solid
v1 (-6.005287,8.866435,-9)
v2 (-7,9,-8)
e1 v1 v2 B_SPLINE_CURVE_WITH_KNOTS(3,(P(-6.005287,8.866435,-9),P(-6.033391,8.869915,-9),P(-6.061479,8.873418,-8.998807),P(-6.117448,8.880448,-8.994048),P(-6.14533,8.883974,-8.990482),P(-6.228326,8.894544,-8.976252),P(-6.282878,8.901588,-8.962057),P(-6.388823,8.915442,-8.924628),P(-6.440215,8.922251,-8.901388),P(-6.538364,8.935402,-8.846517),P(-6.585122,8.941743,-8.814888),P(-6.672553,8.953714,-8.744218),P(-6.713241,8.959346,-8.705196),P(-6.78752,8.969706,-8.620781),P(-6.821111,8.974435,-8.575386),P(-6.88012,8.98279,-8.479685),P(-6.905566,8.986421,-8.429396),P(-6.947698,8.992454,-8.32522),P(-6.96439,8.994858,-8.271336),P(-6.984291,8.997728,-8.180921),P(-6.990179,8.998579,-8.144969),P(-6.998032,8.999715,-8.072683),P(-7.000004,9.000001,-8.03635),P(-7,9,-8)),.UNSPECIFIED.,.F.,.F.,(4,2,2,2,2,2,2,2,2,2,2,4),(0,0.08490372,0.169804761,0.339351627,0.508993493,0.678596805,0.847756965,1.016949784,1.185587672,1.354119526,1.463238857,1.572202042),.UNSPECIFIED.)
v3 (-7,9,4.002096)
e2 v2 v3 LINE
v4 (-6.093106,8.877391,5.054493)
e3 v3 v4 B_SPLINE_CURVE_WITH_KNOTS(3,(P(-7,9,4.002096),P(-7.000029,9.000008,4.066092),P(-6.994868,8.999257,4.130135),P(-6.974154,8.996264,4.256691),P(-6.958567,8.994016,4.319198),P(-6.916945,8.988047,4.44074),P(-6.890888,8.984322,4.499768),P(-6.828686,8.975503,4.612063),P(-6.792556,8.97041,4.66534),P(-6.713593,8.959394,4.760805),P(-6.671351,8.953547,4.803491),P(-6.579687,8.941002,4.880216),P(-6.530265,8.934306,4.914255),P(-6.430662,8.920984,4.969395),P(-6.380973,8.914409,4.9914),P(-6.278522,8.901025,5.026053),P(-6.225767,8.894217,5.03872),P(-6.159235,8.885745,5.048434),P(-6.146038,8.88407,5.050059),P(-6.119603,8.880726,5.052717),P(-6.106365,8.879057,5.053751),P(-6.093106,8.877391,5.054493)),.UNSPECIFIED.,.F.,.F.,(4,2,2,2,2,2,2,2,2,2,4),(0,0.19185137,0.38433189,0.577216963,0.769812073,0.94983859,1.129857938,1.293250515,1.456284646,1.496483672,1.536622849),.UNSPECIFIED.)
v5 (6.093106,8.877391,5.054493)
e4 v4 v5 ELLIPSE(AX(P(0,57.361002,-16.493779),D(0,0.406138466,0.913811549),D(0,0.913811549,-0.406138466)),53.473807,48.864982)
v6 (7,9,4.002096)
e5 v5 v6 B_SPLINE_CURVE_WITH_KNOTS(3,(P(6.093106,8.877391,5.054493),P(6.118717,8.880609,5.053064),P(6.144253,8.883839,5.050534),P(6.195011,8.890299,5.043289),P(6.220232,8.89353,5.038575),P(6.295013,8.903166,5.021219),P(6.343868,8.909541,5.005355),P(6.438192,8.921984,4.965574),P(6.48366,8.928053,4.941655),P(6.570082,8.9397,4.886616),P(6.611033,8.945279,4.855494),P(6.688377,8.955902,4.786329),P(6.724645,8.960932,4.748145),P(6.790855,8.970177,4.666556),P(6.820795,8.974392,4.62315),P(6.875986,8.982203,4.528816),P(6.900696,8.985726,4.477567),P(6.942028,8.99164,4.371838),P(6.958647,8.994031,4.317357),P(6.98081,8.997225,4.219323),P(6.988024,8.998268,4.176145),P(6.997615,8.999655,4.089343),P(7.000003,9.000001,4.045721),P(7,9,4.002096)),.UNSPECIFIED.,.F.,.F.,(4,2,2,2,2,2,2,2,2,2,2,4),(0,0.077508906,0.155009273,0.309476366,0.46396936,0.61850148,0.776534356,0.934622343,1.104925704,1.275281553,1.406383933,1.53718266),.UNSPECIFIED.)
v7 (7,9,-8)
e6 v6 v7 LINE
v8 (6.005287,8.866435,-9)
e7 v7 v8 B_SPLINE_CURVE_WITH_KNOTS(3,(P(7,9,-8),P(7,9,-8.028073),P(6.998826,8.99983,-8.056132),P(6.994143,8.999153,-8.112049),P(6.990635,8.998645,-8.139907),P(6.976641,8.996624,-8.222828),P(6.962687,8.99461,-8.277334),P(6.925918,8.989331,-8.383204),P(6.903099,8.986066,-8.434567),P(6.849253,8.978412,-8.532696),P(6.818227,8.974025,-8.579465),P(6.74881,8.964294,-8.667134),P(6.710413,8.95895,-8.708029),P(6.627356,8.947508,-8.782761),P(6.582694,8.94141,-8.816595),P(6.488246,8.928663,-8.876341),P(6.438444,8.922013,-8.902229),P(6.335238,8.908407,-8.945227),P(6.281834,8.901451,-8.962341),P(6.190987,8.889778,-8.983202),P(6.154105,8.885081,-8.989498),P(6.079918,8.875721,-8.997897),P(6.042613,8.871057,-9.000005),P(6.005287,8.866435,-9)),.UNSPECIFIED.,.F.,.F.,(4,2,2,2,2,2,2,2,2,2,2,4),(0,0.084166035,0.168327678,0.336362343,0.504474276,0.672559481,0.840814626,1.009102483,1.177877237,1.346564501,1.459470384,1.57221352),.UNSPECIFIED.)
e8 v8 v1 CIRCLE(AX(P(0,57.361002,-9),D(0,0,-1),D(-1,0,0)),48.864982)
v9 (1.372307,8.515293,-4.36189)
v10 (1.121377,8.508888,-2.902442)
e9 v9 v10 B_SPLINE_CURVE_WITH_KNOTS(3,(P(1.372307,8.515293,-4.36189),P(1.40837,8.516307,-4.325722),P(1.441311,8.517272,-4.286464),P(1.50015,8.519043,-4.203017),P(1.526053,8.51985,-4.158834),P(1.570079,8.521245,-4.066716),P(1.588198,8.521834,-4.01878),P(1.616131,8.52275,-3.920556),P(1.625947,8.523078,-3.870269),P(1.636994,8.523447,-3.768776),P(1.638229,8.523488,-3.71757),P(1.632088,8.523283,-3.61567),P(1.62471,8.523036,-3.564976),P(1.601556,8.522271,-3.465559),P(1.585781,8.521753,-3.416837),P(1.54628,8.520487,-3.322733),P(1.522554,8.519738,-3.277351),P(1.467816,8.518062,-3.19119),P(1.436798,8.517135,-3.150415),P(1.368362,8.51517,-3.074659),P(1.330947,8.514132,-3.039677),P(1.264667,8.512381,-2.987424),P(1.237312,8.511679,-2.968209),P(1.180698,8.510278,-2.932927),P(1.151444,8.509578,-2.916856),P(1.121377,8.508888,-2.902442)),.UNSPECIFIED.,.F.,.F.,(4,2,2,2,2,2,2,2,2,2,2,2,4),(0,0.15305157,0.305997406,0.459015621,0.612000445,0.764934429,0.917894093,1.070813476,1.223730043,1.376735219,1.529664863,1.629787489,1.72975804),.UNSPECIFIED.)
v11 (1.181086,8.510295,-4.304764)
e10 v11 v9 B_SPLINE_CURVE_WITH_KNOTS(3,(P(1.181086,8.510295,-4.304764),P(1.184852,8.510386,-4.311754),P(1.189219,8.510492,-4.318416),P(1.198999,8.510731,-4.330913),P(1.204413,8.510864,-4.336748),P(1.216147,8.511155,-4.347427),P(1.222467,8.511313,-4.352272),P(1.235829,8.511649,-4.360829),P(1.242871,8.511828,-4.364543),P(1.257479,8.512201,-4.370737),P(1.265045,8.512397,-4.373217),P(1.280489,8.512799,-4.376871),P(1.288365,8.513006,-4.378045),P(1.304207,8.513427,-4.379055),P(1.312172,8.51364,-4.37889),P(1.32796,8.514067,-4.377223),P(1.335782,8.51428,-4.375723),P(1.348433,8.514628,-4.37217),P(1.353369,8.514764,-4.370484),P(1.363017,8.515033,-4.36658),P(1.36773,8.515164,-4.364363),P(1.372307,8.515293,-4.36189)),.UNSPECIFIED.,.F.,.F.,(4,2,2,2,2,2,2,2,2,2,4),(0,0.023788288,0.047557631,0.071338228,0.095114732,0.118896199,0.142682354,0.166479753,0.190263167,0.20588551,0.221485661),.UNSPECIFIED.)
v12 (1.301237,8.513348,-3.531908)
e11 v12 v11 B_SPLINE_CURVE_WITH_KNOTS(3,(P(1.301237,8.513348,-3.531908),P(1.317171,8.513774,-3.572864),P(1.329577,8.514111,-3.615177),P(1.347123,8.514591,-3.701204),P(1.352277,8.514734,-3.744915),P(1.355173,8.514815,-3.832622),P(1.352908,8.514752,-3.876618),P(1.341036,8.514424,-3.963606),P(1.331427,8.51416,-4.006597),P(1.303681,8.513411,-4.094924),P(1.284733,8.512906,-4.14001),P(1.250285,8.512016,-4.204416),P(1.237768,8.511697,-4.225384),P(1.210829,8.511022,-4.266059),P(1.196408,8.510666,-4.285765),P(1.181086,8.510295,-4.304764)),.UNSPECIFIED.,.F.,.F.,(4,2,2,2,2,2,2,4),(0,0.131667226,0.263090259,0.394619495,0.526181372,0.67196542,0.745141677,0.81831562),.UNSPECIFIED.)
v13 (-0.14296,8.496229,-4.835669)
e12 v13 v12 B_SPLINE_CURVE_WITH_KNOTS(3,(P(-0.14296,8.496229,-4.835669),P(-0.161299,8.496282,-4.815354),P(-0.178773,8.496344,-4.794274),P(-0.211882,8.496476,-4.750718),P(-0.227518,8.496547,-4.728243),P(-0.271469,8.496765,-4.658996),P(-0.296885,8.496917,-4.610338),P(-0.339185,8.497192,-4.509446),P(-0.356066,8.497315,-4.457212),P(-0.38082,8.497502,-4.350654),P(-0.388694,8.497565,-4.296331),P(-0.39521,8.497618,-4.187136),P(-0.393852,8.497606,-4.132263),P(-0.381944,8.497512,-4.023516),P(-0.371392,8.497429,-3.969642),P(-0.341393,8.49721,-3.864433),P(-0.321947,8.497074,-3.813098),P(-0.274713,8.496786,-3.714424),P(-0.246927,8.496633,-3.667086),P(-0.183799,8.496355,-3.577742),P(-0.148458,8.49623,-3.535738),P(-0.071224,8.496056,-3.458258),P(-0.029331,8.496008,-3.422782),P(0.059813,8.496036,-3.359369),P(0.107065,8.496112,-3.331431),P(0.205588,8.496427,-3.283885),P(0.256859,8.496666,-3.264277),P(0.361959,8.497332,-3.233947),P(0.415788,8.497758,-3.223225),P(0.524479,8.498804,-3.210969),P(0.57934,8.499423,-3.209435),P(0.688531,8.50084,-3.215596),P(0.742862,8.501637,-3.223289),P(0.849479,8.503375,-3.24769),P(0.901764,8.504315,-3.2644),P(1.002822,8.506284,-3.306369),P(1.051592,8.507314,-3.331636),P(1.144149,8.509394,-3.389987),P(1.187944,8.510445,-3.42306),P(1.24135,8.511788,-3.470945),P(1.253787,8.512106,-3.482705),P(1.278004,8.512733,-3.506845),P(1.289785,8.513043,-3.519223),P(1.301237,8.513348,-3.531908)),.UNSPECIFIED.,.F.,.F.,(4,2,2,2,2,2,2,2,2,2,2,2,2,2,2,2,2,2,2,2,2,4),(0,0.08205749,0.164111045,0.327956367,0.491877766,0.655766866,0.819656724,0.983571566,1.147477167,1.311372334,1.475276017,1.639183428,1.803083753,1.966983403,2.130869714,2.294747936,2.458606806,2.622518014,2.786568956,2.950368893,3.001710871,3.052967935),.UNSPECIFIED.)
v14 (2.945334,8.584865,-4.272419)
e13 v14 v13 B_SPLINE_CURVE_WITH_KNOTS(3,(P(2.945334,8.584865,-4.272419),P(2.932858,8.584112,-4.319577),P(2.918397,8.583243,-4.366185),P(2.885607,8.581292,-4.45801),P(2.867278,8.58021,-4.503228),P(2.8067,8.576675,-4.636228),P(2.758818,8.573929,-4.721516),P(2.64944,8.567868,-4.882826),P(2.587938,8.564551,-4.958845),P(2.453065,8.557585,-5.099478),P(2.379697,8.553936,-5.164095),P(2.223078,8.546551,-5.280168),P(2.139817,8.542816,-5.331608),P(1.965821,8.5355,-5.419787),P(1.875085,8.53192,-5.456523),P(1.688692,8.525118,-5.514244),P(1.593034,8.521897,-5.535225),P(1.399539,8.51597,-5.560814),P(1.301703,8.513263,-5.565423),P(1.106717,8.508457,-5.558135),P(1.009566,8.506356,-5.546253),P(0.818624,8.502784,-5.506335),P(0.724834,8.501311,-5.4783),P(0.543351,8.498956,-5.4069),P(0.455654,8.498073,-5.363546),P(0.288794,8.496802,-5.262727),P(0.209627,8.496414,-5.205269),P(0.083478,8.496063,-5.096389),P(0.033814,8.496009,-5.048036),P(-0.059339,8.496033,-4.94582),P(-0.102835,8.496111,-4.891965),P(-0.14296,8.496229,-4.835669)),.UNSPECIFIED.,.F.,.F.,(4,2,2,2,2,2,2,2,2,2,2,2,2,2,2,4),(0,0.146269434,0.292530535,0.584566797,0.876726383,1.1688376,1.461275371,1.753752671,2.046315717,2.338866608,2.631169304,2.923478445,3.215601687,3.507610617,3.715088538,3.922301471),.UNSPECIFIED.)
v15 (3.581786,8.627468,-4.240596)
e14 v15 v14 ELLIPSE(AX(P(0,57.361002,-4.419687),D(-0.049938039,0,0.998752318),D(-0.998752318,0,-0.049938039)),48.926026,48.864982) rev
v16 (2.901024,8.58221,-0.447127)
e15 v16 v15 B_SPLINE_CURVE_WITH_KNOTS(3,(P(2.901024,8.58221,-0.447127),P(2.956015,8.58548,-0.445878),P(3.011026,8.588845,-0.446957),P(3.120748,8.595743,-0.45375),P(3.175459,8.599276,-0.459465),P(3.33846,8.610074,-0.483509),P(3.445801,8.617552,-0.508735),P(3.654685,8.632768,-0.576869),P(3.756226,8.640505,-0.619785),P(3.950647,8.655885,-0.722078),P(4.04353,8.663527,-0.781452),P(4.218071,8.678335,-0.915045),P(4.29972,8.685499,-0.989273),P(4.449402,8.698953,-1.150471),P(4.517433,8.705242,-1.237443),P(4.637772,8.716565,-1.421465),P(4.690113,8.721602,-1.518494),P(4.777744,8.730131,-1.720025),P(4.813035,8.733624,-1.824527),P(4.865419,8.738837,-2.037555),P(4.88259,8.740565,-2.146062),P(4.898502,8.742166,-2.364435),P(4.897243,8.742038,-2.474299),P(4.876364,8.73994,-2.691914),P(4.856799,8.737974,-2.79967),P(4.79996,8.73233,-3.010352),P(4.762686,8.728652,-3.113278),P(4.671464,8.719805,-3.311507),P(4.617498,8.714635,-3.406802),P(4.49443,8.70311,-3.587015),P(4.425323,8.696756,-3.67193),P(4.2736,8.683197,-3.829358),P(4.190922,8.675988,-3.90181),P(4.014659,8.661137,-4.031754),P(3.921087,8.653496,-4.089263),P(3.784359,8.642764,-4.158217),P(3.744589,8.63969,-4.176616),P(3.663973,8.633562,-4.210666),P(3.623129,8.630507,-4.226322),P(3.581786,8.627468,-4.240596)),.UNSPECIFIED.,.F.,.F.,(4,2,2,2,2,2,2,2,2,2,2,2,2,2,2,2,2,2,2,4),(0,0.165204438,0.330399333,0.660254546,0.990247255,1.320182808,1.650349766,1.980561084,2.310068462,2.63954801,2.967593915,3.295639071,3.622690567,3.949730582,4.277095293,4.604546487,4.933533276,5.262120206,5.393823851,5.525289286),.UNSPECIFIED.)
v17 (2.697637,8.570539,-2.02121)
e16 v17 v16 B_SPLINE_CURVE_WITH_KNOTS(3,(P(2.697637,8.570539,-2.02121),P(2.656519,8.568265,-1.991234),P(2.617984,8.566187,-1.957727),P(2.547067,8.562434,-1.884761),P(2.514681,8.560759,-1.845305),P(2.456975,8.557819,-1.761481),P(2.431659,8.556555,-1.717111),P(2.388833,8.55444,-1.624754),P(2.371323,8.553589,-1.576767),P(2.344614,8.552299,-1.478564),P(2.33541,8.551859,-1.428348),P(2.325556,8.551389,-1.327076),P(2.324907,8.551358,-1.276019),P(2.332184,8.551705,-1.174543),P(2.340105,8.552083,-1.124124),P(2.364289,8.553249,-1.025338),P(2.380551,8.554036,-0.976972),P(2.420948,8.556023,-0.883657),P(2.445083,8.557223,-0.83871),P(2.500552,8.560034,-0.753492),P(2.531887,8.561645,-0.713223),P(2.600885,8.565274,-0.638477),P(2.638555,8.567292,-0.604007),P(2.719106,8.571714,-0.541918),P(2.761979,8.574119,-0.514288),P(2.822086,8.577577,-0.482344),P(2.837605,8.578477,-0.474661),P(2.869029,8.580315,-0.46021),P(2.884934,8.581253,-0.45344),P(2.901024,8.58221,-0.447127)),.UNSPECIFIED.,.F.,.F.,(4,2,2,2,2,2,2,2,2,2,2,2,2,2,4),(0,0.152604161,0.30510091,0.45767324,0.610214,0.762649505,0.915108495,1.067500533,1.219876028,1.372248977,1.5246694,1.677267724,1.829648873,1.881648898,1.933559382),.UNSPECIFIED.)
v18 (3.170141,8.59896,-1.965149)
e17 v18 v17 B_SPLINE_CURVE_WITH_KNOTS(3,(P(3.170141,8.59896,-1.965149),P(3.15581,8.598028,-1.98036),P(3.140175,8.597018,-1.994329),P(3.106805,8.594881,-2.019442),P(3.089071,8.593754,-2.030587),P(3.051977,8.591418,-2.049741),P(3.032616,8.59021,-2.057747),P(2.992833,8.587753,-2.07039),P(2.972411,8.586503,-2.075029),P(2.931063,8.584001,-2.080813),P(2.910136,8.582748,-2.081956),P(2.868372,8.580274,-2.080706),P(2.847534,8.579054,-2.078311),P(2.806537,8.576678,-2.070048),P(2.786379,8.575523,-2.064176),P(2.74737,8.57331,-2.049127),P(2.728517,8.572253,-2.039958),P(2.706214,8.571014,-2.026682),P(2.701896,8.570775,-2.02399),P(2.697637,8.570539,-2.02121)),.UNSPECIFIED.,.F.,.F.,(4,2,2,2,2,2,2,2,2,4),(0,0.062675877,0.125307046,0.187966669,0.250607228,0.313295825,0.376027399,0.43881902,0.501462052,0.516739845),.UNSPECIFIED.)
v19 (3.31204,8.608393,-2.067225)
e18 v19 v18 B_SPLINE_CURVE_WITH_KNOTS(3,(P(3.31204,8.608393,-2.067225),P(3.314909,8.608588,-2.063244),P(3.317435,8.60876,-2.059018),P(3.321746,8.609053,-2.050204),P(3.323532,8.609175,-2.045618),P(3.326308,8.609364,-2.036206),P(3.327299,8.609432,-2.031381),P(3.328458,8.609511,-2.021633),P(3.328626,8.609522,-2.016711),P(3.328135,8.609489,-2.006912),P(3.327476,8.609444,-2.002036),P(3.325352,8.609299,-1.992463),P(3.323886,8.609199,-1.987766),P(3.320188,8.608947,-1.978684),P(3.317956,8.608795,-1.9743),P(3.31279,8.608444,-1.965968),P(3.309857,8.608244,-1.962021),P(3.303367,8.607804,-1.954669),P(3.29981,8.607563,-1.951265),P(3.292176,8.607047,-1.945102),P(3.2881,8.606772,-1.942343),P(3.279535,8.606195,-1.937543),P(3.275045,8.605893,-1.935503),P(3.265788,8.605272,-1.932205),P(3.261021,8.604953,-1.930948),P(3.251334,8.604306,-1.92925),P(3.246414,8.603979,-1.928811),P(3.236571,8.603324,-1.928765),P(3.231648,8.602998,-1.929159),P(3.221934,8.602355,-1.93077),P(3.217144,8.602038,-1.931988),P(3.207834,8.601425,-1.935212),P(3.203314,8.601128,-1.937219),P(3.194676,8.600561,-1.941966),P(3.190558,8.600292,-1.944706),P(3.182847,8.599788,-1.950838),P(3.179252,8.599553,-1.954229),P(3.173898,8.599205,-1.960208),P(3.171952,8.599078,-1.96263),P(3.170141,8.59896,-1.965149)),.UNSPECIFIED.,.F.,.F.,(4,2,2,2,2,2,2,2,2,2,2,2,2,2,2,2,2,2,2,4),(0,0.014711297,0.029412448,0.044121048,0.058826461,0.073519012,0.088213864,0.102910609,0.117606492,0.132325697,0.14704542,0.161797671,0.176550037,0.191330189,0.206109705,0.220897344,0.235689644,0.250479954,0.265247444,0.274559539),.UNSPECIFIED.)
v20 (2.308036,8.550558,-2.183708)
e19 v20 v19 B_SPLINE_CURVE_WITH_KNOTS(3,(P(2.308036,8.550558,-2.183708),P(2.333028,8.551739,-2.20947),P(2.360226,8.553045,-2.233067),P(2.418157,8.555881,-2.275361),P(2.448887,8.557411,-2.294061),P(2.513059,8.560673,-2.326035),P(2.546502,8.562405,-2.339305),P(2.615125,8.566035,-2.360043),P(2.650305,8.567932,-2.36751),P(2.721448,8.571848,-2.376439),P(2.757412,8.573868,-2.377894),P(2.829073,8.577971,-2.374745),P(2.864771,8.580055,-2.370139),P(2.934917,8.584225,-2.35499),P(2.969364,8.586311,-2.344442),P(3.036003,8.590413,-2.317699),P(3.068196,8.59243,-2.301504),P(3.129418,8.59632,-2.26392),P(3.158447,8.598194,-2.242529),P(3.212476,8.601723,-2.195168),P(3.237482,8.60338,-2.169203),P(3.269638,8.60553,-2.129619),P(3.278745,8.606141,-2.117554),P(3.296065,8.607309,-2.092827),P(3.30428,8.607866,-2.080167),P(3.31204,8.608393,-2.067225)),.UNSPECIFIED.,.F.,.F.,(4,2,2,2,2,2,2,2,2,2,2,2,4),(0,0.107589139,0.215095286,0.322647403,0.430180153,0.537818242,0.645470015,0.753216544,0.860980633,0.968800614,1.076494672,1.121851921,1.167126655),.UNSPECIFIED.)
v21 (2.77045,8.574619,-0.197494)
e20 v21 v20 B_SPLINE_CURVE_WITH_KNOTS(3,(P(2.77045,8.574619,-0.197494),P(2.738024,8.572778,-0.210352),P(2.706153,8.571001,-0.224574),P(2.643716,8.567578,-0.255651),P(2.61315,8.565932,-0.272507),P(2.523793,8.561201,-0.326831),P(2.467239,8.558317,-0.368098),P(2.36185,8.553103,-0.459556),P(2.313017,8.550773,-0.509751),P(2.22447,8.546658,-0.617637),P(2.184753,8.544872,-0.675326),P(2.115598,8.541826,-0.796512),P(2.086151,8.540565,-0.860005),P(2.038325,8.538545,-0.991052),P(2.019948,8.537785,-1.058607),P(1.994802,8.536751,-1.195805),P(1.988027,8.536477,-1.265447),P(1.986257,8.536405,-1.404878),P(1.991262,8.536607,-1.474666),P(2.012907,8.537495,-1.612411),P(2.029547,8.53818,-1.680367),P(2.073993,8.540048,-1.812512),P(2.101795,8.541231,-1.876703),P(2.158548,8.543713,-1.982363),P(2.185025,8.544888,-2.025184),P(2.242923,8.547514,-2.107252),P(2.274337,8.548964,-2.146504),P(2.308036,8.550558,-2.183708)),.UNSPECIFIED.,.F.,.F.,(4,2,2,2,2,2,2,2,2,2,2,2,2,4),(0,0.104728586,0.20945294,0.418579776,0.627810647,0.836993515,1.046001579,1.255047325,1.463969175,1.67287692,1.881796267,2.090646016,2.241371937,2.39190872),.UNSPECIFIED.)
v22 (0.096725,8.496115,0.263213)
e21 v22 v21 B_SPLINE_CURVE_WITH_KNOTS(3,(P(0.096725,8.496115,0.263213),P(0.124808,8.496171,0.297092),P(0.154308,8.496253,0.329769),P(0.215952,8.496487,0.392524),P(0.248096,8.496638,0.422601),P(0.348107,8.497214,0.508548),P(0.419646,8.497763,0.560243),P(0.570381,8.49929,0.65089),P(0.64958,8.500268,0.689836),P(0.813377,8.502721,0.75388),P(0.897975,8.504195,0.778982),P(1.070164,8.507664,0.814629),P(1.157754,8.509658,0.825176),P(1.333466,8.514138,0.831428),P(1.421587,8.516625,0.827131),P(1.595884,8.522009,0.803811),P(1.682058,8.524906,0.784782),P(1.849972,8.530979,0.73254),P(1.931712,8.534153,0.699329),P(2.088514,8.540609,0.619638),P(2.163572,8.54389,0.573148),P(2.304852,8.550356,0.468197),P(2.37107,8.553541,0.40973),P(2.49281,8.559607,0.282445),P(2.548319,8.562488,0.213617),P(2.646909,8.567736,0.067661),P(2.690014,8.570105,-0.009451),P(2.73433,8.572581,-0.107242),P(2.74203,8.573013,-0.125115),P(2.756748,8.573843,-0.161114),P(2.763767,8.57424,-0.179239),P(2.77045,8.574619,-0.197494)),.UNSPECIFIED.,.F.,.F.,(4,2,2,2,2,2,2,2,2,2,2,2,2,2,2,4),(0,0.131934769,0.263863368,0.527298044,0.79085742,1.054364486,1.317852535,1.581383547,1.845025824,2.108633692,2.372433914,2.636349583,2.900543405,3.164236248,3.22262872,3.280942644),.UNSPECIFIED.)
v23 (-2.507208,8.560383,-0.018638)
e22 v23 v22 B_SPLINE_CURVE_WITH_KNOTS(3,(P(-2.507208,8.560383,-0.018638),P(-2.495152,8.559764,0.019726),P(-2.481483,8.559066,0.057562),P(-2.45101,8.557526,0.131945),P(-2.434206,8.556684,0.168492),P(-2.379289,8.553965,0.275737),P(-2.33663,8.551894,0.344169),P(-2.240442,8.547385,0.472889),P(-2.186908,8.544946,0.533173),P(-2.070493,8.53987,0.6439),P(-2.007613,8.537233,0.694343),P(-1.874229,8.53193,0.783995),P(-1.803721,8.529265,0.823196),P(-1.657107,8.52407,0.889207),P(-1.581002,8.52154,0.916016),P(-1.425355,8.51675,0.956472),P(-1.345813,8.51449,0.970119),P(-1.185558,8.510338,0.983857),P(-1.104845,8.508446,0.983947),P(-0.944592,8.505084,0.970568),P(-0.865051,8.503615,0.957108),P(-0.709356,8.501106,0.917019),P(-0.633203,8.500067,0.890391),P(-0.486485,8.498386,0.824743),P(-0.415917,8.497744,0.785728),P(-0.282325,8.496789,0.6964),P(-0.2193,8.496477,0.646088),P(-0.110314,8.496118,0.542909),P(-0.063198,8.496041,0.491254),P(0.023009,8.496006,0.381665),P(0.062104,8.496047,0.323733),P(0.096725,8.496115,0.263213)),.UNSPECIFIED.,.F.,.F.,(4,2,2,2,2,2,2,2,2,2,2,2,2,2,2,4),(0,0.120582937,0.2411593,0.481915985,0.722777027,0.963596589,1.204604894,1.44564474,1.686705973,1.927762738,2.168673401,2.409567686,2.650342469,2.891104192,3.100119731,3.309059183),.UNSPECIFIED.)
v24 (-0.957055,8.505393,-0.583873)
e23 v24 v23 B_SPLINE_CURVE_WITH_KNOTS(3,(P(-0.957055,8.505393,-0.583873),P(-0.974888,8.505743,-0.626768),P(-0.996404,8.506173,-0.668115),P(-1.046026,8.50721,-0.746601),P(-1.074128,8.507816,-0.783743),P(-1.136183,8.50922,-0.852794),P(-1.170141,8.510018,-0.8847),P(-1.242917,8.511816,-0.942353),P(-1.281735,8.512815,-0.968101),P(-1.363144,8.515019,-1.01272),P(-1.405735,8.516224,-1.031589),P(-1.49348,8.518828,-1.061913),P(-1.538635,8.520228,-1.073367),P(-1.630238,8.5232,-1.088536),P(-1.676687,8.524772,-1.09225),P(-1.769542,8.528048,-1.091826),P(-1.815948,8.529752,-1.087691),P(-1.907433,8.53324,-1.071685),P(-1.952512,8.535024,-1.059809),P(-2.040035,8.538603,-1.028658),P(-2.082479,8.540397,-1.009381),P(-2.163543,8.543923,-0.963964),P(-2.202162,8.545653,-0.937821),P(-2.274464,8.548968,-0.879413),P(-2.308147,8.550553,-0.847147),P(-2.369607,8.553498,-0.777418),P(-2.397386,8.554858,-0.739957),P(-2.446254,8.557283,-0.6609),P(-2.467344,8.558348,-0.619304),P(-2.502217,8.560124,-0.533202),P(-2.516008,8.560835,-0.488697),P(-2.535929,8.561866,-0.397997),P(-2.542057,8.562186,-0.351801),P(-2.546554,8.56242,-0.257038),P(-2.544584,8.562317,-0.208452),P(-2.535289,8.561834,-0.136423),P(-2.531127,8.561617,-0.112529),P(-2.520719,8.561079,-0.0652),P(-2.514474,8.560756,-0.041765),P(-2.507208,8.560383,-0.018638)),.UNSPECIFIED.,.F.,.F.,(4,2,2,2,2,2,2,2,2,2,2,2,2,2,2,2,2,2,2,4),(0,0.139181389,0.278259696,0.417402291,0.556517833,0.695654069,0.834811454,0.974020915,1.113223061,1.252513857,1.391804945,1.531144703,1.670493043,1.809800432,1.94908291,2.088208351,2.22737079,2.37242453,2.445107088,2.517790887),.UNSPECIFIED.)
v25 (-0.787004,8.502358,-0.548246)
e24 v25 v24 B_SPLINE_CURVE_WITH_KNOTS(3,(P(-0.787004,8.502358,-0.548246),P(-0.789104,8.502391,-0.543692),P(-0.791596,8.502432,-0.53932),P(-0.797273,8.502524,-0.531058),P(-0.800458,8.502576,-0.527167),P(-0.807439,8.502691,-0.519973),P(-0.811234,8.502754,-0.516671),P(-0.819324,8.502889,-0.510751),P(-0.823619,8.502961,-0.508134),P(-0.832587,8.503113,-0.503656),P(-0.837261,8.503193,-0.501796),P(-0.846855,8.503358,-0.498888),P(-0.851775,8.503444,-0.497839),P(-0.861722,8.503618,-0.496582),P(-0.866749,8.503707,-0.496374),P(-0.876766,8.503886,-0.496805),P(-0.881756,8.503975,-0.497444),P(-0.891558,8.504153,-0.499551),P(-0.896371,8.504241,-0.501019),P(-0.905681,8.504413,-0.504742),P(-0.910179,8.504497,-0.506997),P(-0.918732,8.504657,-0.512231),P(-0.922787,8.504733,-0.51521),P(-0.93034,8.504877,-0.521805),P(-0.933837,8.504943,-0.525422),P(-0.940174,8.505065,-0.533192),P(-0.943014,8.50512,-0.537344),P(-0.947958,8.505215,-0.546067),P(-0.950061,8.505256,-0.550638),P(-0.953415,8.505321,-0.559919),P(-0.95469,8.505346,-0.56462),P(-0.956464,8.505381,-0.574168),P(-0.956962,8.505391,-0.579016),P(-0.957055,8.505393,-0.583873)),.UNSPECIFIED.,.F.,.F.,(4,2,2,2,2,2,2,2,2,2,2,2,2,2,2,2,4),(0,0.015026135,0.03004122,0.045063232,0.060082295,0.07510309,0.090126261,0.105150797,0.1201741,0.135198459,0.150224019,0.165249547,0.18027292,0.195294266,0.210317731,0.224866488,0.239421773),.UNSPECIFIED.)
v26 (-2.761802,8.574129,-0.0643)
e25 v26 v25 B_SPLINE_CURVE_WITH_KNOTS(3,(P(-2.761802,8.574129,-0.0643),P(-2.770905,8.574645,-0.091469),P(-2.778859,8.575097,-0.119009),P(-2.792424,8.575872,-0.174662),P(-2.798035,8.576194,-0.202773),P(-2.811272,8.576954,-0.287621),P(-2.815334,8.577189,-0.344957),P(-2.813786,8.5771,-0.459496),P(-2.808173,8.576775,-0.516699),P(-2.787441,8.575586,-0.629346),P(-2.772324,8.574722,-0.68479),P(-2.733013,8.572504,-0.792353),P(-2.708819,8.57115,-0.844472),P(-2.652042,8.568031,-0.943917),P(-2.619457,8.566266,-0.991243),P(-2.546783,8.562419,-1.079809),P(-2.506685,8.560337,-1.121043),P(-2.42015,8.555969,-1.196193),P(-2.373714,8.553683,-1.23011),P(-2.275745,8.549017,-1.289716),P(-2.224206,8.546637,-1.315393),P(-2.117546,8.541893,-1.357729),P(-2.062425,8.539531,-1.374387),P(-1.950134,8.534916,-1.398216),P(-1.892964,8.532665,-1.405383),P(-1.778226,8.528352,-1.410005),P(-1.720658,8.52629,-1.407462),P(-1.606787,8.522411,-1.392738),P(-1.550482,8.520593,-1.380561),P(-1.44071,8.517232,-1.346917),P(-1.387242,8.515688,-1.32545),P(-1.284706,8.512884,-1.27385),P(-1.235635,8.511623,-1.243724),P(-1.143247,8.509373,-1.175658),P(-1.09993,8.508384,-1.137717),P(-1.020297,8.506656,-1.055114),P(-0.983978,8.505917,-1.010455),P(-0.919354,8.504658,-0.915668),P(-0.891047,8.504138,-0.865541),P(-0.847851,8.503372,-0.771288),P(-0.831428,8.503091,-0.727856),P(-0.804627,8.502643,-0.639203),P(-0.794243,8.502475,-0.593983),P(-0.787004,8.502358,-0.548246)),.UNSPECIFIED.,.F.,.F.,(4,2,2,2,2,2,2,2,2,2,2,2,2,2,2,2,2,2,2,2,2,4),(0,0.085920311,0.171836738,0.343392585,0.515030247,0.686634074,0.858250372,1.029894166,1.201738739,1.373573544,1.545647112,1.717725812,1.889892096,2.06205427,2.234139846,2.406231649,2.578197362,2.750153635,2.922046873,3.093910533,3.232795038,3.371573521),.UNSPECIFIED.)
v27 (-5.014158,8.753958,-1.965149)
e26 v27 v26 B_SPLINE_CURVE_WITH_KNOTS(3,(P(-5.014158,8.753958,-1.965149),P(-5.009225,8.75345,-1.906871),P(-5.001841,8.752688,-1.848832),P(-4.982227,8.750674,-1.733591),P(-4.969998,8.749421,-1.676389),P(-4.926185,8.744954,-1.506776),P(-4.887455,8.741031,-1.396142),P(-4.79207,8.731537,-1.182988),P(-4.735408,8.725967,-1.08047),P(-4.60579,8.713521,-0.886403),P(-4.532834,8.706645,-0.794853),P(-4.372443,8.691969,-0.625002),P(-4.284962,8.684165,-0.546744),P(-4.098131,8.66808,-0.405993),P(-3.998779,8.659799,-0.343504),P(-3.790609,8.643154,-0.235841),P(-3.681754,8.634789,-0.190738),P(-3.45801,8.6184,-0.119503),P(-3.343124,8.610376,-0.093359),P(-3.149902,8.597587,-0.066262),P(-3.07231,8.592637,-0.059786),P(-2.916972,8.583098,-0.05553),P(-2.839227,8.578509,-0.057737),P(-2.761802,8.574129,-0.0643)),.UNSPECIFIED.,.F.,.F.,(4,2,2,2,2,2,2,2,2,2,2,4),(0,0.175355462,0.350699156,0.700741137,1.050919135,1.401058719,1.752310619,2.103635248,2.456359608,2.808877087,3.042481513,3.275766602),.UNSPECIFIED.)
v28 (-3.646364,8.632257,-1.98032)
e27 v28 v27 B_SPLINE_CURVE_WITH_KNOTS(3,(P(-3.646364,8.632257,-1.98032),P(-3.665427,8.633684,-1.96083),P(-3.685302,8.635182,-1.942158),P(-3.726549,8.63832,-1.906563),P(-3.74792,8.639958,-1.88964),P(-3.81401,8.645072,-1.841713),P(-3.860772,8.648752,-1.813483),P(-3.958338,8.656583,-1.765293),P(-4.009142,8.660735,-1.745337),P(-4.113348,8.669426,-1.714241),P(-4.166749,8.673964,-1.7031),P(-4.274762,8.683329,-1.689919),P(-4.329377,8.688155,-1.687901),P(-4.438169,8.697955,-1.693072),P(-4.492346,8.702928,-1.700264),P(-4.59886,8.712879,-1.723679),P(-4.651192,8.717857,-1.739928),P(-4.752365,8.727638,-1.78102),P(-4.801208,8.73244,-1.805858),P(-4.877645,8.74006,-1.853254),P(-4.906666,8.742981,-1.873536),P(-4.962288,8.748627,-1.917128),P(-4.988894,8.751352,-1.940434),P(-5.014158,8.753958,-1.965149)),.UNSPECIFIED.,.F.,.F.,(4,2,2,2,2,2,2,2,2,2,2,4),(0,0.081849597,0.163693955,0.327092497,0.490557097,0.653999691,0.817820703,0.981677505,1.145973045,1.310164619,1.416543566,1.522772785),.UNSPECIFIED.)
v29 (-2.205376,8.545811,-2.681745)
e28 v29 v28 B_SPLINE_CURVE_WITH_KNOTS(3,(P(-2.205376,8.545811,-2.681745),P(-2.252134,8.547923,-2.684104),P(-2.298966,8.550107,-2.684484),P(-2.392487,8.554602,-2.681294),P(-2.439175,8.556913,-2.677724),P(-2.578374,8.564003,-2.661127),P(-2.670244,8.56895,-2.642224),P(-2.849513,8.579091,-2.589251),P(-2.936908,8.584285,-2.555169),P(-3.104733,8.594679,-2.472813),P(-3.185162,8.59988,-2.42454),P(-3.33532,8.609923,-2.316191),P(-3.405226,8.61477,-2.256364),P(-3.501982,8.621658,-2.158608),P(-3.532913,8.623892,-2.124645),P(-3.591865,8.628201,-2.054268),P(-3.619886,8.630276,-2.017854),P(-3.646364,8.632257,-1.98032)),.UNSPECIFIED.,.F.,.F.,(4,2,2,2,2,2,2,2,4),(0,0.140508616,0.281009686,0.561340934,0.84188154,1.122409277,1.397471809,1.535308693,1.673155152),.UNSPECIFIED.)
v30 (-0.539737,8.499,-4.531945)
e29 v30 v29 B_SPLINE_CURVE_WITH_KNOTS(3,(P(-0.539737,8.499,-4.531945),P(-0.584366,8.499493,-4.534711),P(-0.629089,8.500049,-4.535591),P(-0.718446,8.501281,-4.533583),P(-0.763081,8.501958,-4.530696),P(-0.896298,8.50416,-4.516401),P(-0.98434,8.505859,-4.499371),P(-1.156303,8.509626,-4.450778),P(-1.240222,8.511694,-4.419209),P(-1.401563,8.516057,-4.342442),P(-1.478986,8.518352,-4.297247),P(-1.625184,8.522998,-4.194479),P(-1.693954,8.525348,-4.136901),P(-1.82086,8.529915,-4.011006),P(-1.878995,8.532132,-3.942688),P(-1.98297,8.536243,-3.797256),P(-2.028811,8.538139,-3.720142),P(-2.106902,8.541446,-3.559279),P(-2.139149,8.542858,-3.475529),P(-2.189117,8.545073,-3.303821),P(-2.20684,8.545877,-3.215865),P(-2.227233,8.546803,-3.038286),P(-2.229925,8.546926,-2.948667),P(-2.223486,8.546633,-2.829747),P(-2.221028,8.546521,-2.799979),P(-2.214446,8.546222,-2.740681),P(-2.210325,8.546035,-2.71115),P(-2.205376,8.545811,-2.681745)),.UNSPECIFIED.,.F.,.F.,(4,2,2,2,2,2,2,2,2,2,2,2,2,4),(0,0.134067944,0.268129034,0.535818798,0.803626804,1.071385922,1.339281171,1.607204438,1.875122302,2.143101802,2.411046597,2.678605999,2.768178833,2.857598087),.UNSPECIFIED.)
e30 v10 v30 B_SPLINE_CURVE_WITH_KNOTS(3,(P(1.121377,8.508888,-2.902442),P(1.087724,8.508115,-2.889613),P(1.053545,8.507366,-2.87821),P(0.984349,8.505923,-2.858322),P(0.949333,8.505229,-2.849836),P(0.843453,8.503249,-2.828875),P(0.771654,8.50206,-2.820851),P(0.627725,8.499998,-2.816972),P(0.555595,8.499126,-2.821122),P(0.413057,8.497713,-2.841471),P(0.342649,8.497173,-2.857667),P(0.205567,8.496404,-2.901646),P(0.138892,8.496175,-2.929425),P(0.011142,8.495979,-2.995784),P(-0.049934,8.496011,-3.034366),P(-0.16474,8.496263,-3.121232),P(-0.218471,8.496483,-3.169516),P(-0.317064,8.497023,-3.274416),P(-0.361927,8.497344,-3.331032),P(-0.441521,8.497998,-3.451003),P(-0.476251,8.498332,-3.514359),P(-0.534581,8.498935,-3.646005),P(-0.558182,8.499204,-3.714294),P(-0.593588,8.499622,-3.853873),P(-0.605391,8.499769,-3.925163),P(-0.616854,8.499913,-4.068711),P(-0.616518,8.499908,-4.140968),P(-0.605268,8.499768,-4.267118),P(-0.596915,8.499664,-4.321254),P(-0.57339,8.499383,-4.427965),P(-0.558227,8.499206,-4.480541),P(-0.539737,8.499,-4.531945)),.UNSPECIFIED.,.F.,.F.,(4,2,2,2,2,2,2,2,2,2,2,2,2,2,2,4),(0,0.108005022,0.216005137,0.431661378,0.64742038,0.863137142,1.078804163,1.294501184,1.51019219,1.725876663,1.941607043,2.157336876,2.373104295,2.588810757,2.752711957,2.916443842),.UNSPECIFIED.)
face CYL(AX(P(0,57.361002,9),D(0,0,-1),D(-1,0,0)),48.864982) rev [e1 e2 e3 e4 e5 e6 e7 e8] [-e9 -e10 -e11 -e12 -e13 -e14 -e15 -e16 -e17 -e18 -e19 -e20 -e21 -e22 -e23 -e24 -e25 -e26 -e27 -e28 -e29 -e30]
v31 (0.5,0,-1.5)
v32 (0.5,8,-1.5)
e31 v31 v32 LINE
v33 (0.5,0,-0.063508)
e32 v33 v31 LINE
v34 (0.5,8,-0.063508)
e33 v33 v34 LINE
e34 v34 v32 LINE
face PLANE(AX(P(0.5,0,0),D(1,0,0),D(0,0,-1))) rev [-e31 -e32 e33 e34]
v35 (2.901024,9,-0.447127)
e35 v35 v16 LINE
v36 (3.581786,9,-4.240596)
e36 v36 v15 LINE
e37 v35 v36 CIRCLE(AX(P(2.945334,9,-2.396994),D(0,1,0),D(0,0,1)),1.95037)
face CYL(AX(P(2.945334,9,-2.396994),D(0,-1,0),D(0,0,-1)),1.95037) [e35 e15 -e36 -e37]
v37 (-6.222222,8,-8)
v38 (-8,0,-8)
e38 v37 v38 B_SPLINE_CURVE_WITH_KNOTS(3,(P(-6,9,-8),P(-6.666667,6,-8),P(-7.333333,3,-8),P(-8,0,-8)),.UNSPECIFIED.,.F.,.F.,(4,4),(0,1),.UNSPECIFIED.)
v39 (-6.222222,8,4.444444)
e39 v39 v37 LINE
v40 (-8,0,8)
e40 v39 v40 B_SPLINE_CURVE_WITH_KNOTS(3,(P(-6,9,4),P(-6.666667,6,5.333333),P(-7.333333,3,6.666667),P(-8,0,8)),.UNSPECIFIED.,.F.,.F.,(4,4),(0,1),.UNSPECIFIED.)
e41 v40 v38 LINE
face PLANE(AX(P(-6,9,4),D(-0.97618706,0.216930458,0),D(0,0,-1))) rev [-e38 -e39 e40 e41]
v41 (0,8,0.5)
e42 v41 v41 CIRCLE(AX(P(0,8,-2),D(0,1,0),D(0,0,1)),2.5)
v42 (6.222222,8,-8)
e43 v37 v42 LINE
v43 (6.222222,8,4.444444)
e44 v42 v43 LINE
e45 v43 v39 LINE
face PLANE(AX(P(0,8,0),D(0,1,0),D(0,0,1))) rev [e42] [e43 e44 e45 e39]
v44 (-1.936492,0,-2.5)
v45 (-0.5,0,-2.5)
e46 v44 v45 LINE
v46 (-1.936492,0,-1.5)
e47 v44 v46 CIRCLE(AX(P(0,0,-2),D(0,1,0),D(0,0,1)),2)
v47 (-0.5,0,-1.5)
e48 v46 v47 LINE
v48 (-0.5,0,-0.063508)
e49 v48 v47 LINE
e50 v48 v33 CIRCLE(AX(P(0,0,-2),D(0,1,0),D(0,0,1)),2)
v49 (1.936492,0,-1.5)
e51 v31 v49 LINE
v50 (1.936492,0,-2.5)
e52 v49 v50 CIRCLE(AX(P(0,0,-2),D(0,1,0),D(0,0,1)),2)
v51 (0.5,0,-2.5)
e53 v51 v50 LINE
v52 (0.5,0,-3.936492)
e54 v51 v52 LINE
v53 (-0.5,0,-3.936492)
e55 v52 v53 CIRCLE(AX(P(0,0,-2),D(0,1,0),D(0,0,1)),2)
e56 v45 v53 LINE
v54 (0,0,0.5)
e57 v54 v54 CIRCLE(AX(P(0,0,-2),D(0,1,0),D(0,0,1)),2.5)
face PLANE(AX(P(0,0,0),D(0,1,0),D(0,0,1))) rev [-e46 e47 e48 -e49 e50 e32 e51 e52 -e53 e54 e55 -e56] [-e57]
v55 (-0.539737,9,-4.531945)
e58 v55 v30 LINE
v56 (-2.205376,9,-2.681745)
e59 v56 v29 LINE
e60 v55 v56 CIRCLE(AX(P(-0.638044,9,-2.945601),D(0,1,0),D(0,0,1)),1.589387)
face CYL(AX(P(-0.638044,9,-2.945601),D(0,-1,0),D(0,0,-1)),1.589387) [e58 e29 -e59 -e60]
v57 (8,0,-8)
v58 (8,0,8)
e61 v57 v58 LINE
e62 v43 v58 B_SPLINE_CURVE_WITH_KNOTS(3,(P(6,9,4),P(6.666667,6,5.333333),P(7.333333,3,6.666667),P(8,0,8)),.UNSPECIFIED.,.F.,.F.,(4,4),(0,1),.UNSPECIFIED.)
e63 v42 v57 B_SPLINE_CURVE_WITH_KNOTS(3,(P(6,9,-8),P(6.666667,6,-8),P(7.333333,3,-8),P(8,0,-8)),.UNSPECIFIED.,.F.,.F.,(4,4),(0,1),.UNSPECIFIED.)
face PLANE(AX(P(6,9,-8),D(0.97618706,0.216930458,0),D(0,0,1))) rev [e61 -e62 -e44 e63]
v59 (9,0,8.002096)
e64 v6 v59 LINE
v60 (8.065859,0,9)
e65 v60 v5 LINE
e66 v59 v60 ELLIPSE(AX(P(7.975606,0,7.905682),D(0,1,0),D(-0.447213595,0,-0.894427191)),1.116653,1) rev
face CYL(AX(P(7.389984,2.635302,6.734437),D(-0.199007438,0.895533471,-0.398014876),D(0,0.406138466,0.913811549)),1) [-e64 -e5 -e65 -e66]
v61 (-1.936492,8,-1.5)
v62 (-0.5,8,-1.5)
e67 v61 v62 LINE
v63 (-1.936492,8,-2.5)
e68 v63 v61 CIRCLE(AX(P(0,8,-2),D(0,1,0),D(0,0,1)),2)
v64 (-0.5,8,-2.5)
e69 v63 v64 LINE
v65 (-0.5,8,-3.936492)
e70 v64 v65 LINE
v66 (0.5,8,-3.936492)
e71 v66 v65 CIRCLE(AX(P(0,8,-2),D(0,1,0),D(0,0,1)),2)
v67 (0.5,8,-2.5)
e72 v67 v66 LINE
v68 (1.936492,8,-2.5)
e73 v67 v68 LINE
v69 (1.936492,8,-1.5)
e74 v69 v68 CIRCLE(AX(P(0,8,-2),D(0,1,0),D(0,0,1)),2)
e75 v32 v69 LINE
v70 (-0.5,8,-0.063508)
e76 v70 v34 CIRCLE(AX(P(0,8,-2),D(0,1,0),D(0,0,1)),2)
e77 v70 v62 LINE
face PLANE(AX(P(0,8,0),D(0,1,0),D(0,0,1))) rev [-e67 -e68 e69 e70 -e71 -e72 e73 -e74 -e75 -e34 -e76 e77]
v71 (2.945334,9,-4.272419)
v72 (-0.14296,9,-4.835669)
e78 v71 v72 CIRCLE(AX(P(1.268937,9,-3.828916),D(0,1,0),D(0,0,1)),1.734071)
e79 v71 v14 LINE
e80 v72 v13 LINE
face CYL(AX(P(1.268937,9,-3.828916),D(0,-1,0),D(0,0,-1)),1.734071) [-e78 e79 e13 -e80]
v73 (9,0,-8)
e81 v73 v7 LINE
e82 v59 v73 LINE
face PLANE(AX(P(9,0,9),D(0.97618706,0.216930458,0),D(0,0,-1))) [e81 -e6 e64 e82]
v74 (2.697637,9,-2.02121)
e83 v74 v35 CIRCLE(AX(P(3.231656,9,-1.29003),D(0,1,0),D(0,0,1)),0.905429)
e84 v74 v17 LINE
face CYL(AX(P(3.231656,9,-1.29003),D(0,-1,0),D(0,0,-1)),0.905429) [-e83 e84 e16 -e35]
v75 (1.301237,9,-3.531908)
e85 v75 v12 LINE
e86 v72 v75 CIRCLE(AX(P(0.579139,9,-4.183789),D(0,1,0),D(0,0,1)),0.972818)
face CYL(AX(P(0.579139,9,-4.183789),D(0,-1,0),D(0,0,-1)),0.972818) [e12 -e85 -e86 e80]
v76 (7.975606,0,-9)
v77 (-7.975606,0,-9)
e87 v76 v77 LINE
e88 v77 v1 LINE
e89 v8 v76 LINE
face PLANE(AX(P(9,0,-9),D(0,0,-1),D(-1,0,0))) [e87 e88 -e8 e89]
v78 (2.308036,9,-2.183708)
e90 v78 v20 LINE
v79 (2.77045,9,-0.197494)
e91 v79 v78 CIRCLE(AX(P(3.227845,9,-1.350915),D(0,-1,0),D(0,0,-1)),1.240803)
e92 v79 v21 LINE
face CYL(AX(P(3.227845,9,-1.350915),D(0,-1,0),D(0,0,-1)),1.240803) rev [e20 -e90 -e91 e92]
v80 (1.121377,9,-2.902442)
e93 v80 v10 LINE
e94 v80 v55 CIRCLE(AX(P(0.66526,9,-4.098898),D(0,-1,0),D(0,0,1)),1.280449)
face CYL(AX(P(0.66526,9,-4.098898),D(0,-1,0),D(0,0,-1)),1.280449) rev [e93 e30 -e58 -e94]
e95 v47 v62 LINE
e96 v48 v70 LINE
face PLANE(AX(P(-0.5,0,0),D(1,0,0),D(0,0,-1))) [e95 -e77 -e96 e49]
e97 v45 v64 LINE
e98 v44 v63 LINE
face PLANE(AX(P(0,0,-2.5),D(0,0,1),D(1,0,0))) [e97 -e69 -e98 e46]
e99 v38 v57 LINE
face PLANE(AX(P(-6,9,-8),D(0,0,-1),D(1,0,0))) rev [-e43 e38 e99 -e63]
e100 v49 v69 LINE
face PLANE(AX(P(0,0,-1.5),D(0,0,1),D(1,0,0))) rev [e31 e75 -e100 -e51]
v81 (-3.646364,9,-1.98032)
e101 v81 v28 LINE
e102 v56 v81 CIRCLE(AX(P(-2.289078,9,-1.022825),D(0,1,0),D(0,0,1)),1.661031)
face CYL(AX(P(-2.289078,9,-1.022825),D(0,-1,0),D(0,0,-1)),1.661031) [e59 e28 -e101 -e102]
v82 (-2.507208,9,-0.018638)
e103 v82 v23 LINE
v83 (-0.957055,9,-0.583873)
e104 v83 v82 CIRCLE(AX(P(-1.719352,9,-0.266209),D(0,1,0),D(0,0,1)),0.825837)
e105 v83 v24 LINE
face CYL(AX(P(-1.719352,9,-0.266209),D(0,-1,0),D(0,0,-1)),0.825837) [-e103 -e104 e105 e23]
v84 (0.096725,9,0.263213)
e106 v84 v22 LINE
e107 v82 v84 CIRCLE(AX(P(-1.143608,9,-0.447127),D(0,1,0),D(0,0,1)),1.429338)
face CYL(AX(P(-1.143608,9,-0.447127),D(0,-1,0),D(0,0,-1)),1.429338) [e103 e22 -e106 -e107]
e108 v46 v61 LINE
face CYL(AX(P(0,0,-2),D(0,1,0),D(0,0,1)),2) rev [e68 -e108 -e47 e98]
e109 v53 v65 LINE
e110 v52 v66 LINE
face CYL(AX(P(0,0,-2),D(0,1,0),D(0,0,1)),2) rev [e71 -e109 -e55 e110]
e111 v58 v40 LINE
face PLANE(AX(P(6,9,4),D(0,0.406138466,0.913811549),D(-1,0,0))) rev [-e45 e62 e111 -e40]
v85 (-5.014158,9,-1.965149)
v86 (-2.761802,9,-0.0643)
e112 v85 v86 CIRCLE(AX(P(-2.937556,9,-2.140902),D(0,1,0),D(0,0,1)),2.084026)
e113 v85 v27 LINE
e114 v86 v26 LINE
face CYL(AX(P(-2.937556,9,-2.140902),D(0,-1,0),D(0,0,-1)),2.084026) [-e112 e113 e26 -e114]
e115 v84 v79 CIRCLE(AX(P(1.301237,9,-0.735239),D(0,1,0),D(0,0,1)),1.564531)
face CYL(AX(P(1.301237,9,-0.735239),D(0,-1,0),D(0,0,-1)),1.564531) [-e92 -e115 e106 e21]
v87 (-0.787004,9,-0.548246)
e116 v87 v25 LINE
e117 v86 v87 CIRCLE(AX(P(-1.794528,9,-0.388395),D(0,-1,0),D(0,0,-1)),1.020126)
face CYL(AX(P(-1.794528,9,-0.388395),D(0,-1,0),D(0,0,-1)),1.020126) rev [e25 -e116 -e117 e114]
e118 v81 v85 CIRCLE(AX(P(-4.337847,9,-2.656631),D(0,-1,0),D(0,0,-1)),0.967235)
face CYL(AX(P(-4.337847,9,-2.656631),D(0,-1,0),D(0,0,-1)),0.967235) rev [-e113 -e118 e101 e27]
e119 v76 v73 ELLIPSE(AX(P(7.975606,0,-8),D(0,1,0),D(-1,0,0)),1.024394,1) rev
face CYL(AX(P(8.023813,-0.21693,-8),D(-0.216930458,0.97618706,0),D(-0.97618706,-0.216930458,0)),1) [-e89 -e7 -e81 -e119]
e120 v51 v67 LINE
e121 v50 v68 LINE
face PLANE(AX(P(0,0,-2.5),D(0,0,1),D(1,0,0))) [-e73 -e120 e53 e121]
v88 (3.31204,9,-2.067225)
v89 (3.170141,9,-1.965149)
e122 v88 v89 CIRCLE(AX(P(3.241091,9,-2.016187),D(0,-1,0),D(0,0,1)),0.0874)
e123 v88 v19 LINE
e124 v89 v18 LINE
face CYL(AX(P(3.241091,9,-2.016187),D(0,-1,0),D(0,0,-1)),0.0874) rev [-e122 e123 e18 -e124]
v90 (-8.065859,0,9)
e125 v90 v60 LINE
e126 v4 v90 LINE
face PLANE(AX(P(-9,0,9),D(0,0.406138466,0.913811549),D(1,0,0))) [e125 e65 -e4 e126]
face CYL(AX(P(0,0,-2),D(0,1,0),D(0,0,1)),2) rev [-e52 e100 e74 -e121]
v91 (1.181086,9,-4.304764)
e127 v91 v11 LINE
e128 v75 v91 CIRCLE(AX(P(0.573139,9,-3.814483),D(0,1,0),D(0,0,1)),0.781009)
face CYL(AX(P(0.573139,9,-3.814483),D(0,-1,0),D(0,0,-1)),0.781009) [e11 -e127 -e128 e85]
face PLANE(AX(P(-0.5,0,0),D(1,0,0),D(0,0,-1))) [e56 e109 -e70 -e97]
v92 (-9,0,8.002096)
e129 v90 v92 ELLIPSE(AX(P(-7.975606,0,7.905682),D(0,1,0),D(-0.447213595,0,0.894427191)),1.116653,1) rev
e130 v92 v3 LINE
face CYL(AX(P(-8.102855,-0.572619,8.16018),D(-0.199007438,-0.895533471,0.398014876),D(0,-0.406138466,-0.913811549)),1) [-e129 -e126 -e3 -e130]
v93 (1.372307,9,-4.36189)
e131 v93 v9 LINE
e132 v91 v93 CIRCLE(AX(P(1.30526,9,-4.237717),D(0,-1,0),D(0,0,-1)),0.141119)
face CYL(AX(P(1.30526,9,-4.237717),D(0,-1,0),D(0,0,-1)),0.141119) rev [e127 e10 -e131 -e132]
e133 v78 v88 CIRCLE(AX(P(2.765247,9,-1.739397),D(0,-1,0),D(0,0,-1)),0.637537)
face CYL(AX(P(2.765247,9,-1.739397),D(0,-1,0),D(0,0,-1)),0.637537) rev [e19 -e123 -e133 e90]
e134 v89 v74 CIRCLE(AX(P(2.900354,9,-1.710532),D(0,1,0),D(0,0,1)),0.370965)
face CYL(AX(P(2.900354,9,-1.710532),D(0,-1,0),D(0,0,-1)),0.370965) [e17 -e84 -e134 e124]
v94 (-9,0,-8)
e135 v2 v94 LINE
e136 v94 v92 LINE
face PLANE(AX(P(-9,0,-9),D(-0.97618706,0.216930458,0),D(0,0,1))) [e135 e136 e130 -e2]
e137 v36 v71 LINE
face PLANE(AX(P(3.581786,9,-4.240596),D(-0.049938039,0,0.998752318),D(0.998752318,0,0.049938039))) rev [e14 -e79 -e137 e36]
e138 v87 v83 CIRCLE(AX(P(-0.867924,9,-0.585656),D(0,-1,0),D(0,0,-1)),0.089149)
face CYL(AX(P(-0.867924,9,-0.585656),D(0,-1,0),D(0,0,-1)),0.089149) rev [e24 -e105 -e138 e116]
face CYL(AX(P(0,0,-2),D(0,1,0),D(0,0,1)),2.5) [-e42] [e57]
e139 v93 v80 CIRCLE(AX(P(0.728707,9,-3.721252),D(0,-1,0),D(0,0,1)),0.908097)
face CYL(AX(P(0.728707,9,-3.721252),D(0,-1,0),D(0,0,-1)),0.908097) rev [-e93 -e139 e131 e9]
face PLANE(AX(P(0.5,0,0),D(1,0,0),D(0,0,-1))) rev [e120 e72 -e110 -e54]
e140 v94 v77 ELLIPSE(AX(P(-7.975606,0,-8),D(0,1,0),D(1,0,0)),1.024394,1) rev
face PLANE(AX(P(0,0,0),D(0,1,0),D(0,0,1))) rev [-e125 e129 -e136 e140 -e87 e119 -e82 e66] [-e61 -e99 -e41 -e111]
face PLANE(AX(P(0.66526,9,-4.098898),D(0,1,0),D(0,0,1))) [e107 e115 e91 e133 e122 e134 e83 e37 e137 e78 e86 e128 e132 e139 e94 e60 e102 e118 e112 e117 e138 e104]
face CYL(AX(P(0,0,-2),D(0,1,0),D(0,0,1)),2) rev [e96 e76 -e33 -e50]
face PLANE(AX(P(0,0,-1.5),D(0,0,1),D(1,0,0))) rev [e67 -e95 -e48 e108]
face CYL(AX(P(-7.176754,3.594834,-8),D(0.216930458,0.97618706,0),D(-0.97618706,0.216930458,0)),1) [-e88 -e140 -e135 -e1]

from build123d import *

# Parameters (mm, degrees)
BOSS_EXTRUDE1_DEPTH = 1
BOSS_EXTRUDE2_START = -1
BOSS_EXTRUDE2_DEPTH = 8
CUT_EXTRUDE1_DEPTH  = 18
FILLET2_R           = 1
BOSS_EXTRUDE3_START = 8
BOSS_EXTRUDE3_DEPTH = 1


with BuildPart() as part:
    # Sketch1 → Loft2 section 0
    with BuildSketch(Plane(origin=(0, 0, 0), x_dir=(1, 0, 0), z_dir=(0, 1, 0))):
        with BuildLine():
            Line((9, -9), (-9, -9))
            Line((-9, -9), (-9, 9))
            Line((-9, 9), (9, 9))
            Line((9, 9), (9, -9))
        make_face()
    # Sketch3 → Loft2 section 1
    with BuildSketch(Plane(origin=(0, 9, 0), x_dir=(1, 0, 0), z_dir=(0, 1, 0))):
        with BuildLine():
            Line((0, 9), (-7, 9))
            Line((-7, 9), (-7, -5))
            Line((-7, -5), (7, -5))
            Line((7, -5), (7, 9))
            Line((7, 9), (0, 9))
        make_face()
    loft()

    # Cut-Loft3: read off the stored shape, not the designer's step
    # Cut-Loft3: loft between two sections, ruled curve by curve
    cut_loft3_from = [
        Edge.make_line((8, 0, -8), (8, 0, 8)),
        Edge.make_line((-8, 0, -8), (8, 0, -8)),
        Edge.make_line((-8, 0, 8), (-8, 0, -8)),
        Edge.make_line((8, 0, 8), (-8, 0, 8)),
    ]
    cut_loft3_to = [
        Edge.make_line((6, 9, -8), (6, 9, 4)),
        Edge.make_line((-6, 9, -8), (6, 9, -8)),
        Edge.make_line((-6, 9, 4), (-6, 9, -8)),
        Edge.make_line((6, 9, 4), (-6, 9, 4)),
    ]
    cut_loft3 = Solid(Shell([*[Face.make_surface_from_curves(cut_loft3_from[k], cut_loft3_to[k]) for k in range(4)], Face(Wire(cut_loft3_from)), Face(Wire(cut_loft3_to))]))
    add(cut_loft3, mode=Mode.SUBTRACT)

    # Sketch3<8> → Boss-Extrude1 (add)
    with BuildSketch(Plane(origin=(0, 9, 0), x_dir=(1, 0, 0), z_dir=(0, 1, 0))):
        Polygon((0, 9), (-7, 9), (-7, -5), (7, -5), (7, 9), align=None)
    extrude(amount=-BOSS_EXTRUDE1_DEPTH)

    # Sketch9 → Boss-Extrude2 (add)
    with BuildSketch(Plane(origin=(0, 9, 0), x_dir=(1, 0, 0), z_dir=(0, 1, 0)).offset(BOSS_EXTRUDE2_START)):
        with BuildLine():
            ThreePointArc((2.5, 2), (1.767766953, 3.767766953), (0, 4.5))
            Line((0, 4.5), (0, 4))
            ThreePointArc((0, 4), (0.252008585, 3.984059393), (0.5, 3.936491673))
            ThreePointArc((0.5, 3.936491673), (1.414213562, 3.414213562), (1.936491673, 2.5))
            ThreePointArc((1.936491673, 2.5), (1.984059393, 2.252008585), (2, 2))
            ThreePointArc((2, 2), (1.984059393, 1.747991415), (1.936491673, 1.5))
            ThreePointArc((1.936491673, 1.5), (1.414213562, 0.585786438), (0.5, 0.063508327))
            ThreePointArc((0.5, 0.063508327), (0.252008585, 0.015940607), (0, 0))
            Line((0, 0), (0, -0.5))
            ThreePointArc((0, -0.5), (1.767766953, 0.232233047), (2.5, 2))
        make_face()
        with BuildLine():
            Line((0, 4), (0, 4.5))
            ThreePointArc((0, 4.5), (-2.5, 2), (0, -0.5))
            Line((0, -0.5), (0, 0))
            ThreePointArc((0, 0), (-0.252008585, 0.015940607), (-0.5, 0.063508327))
            ThreePointArc((-0.5, 0.063508327), (-1.414213562, 0.585786438), (-1.936491673, 1.5))
            ThreePointArc((-1.936491673, 1.5), (-2, 2), (-1.936491673, 2.5))
            ThreePointArc((-1.936491673, 2.5), (-1.414213562, 3.414213562), (-0.5, 3.936491673))
            ThreePointArc((-0.5, 3.936491673), (-0.252008585, 3.984059393), (0, 4))
        make_face()
        with BuildLine():
            Line((-0.5, 2.5), (-0.5, 3.936491673))
            ThreePointArc((-0.5, 3.936491673), (-1.414213562, 3.414213562), (-1.936491673, 2.5))
            Line((-1.936491673, 2.5), (-0.5, 2.5))
        make_face()
        with BuildLine():
            ThreePointArc((1.936491673, 2.5), (1.414213562, 3.414213562), (0.5, 3.936491673))
            Line((0.5, 3.936491673), (0.5, 2.5))
            Line((0.5, 2.5), (1.936491673, 2.5))
        make_face()
        with BuildLine():
            Line((0.5, 1.5), (0.5, 0.063508327))
            ThreePointArc((0.5, 0.063508327), (1.414213562, 0.585786438), (1.936491673, 1.5))
            Line((1.936491673, 1.5), (0.5, 1.5))
        make_face()
        with BuildLine():
            ThreePointArc((-1.936491673, 1.5), (-1.414213562, 0.585786438), (-0.5, 0.063508327))
            Line((-0.5, 0.063508327), (-0.5, 1.5))
            Line((-0.5, 1.5), (-1.936491673, 1.5))
        make_face()
    extrude(amount=-BOSS_EXTRUDE2_DEPTH)

    # Sketch10 → Cut-Extrude1 (cut)
    with BuildSketch(Plane(origin=(0, 0, -9), x_dir=(-1, 0, 0), z_dir=(0, 0, -1))):
        with BuildLine():
            Line((-7, 9), (7, 9))
            ThreePointArc((7, 9), (0, 8.4960195), (-7, 9))
        make_face()
    extrude(amount=-CUT_EXTRUDE1_DEPTH, mode=Mode.SUBTRACT)

    # Fillet2
    fillet2_edges = [part.edges().sort_by_distance(p)[0] for p in [
        (-8, 4.5, -9),
        (8, 4.5, -9),
        (8, 4.5, 7),
        (-8, 4.5, 7),
    ]]
    fillet(fillet2_edges, radius=FILLET2_R)

    # Sketch12 → Boss-Extrude3 (add)
    with BuildSketch(Plane(origin=(0, 0, 0), x_dir=(1, 0, 0), z_dir=(0, 1, 0)).offset(BOSS_EXTRUDE3_START)):
        with BuildLine():
            Line((3.581786245, 4.240596222), (2.945334125, 4.272419097))
            ThreePointArc((2.945334125, 4.272419097), (1.580068464, 5.534847266), (-0.142959574, 4.835669471))
            ThreePointArc((-0.142959574, 4.835669471), (-0.072742065, 3.461690437), (1.301236968, 3.531907946))
            ThreePointArc((1.301236968, 3.531907946), (1.344877857, 3.934460155), (1.181086076, 4.304764166))
            ThreePointArc((1.181086076, 4.304764166), (1.26486543, 4.372930475), (1.372307239, 4.361890385))
            ThreePointArc((1.372307239, 4.361890385), (1.623671348, 3.567376067), (1.121377086, 2.902441943))
            ThreePointArc((1.121377086, 2.902441943), (-0.231414775, 3.184828144), (-0.539737114, 4.531945481))
            ThreePointArc((-0.539737114, 4.531945481), (-1.819279995, 4.009007276), (-2.205376195, 2.681745404))
            ThreePointArc((-2.205376195, 2.681745404), (-3.016060665, 2.51631725), (-3.646364404, 1.980320066))
            ThreePointArc((-3.646364404, 1.980320066), (-4.327119044, 1.689455161), (-5.014157813, 1.965148837))
            ThreePointArc((-5.014157813, 1.965148837), (-4.281658635, 0.548246446), (-2.76180221, 0.064300293))
            ThreePointArc((-2.76180221, 0.064300293), (-2.037336191, 1.379203145), (-0.787003641, 0.548246446))
            ThreePointArc((-0.787003641, 0.548246446), (-0.886204145, 0.498401478), (-0.957055057, 0.583873164))
            ThreePointArc((-0.957055057, 0.583873164), (-2.00225835, 1.042077327), (-2.507207587, 0.018638396))
            ThreePointArc((-2.507207587, 0.018638396), (-1.297421649, -0.973910564), (0.096724797, -0.26321292))
            ThreePointArc((0.096724797, -0.26321292), (1.566904433, -0.806570536), (2.770449564, 0.197493596))
            ThreePointArc((2.770449564, 0.197493596), (2.019360199, 1.069566472), (2.30803646, 2.183708451))
            ThreePointArc((2.30803646, 2.183708451), (2.838720645, 2.372686483), (3.312040204, 2.067224545))
            ThreePointArc((3.312040204, 2.067224545), (3.292128592, 1.945237225), (3.170141272, 1.965148837))
            ThreePointArc((3.170141272, 1.965148837), (2.944061172, 2.078913386), (2.697636855, 2.021210346))
            ThreePointArc((2.697636855, 2.021210346), (2.333692103, 1.174003789), (2.901024067, 0.447127475))
            ThreePointArc((2.901024067, 0.447127475), (4.865037055, 2.052490742), (3.581786245, 4.240596222))
        make_face()
    extrude(amount=BOSS_EXTRUDE3_DEPTH)


solid = part.part
